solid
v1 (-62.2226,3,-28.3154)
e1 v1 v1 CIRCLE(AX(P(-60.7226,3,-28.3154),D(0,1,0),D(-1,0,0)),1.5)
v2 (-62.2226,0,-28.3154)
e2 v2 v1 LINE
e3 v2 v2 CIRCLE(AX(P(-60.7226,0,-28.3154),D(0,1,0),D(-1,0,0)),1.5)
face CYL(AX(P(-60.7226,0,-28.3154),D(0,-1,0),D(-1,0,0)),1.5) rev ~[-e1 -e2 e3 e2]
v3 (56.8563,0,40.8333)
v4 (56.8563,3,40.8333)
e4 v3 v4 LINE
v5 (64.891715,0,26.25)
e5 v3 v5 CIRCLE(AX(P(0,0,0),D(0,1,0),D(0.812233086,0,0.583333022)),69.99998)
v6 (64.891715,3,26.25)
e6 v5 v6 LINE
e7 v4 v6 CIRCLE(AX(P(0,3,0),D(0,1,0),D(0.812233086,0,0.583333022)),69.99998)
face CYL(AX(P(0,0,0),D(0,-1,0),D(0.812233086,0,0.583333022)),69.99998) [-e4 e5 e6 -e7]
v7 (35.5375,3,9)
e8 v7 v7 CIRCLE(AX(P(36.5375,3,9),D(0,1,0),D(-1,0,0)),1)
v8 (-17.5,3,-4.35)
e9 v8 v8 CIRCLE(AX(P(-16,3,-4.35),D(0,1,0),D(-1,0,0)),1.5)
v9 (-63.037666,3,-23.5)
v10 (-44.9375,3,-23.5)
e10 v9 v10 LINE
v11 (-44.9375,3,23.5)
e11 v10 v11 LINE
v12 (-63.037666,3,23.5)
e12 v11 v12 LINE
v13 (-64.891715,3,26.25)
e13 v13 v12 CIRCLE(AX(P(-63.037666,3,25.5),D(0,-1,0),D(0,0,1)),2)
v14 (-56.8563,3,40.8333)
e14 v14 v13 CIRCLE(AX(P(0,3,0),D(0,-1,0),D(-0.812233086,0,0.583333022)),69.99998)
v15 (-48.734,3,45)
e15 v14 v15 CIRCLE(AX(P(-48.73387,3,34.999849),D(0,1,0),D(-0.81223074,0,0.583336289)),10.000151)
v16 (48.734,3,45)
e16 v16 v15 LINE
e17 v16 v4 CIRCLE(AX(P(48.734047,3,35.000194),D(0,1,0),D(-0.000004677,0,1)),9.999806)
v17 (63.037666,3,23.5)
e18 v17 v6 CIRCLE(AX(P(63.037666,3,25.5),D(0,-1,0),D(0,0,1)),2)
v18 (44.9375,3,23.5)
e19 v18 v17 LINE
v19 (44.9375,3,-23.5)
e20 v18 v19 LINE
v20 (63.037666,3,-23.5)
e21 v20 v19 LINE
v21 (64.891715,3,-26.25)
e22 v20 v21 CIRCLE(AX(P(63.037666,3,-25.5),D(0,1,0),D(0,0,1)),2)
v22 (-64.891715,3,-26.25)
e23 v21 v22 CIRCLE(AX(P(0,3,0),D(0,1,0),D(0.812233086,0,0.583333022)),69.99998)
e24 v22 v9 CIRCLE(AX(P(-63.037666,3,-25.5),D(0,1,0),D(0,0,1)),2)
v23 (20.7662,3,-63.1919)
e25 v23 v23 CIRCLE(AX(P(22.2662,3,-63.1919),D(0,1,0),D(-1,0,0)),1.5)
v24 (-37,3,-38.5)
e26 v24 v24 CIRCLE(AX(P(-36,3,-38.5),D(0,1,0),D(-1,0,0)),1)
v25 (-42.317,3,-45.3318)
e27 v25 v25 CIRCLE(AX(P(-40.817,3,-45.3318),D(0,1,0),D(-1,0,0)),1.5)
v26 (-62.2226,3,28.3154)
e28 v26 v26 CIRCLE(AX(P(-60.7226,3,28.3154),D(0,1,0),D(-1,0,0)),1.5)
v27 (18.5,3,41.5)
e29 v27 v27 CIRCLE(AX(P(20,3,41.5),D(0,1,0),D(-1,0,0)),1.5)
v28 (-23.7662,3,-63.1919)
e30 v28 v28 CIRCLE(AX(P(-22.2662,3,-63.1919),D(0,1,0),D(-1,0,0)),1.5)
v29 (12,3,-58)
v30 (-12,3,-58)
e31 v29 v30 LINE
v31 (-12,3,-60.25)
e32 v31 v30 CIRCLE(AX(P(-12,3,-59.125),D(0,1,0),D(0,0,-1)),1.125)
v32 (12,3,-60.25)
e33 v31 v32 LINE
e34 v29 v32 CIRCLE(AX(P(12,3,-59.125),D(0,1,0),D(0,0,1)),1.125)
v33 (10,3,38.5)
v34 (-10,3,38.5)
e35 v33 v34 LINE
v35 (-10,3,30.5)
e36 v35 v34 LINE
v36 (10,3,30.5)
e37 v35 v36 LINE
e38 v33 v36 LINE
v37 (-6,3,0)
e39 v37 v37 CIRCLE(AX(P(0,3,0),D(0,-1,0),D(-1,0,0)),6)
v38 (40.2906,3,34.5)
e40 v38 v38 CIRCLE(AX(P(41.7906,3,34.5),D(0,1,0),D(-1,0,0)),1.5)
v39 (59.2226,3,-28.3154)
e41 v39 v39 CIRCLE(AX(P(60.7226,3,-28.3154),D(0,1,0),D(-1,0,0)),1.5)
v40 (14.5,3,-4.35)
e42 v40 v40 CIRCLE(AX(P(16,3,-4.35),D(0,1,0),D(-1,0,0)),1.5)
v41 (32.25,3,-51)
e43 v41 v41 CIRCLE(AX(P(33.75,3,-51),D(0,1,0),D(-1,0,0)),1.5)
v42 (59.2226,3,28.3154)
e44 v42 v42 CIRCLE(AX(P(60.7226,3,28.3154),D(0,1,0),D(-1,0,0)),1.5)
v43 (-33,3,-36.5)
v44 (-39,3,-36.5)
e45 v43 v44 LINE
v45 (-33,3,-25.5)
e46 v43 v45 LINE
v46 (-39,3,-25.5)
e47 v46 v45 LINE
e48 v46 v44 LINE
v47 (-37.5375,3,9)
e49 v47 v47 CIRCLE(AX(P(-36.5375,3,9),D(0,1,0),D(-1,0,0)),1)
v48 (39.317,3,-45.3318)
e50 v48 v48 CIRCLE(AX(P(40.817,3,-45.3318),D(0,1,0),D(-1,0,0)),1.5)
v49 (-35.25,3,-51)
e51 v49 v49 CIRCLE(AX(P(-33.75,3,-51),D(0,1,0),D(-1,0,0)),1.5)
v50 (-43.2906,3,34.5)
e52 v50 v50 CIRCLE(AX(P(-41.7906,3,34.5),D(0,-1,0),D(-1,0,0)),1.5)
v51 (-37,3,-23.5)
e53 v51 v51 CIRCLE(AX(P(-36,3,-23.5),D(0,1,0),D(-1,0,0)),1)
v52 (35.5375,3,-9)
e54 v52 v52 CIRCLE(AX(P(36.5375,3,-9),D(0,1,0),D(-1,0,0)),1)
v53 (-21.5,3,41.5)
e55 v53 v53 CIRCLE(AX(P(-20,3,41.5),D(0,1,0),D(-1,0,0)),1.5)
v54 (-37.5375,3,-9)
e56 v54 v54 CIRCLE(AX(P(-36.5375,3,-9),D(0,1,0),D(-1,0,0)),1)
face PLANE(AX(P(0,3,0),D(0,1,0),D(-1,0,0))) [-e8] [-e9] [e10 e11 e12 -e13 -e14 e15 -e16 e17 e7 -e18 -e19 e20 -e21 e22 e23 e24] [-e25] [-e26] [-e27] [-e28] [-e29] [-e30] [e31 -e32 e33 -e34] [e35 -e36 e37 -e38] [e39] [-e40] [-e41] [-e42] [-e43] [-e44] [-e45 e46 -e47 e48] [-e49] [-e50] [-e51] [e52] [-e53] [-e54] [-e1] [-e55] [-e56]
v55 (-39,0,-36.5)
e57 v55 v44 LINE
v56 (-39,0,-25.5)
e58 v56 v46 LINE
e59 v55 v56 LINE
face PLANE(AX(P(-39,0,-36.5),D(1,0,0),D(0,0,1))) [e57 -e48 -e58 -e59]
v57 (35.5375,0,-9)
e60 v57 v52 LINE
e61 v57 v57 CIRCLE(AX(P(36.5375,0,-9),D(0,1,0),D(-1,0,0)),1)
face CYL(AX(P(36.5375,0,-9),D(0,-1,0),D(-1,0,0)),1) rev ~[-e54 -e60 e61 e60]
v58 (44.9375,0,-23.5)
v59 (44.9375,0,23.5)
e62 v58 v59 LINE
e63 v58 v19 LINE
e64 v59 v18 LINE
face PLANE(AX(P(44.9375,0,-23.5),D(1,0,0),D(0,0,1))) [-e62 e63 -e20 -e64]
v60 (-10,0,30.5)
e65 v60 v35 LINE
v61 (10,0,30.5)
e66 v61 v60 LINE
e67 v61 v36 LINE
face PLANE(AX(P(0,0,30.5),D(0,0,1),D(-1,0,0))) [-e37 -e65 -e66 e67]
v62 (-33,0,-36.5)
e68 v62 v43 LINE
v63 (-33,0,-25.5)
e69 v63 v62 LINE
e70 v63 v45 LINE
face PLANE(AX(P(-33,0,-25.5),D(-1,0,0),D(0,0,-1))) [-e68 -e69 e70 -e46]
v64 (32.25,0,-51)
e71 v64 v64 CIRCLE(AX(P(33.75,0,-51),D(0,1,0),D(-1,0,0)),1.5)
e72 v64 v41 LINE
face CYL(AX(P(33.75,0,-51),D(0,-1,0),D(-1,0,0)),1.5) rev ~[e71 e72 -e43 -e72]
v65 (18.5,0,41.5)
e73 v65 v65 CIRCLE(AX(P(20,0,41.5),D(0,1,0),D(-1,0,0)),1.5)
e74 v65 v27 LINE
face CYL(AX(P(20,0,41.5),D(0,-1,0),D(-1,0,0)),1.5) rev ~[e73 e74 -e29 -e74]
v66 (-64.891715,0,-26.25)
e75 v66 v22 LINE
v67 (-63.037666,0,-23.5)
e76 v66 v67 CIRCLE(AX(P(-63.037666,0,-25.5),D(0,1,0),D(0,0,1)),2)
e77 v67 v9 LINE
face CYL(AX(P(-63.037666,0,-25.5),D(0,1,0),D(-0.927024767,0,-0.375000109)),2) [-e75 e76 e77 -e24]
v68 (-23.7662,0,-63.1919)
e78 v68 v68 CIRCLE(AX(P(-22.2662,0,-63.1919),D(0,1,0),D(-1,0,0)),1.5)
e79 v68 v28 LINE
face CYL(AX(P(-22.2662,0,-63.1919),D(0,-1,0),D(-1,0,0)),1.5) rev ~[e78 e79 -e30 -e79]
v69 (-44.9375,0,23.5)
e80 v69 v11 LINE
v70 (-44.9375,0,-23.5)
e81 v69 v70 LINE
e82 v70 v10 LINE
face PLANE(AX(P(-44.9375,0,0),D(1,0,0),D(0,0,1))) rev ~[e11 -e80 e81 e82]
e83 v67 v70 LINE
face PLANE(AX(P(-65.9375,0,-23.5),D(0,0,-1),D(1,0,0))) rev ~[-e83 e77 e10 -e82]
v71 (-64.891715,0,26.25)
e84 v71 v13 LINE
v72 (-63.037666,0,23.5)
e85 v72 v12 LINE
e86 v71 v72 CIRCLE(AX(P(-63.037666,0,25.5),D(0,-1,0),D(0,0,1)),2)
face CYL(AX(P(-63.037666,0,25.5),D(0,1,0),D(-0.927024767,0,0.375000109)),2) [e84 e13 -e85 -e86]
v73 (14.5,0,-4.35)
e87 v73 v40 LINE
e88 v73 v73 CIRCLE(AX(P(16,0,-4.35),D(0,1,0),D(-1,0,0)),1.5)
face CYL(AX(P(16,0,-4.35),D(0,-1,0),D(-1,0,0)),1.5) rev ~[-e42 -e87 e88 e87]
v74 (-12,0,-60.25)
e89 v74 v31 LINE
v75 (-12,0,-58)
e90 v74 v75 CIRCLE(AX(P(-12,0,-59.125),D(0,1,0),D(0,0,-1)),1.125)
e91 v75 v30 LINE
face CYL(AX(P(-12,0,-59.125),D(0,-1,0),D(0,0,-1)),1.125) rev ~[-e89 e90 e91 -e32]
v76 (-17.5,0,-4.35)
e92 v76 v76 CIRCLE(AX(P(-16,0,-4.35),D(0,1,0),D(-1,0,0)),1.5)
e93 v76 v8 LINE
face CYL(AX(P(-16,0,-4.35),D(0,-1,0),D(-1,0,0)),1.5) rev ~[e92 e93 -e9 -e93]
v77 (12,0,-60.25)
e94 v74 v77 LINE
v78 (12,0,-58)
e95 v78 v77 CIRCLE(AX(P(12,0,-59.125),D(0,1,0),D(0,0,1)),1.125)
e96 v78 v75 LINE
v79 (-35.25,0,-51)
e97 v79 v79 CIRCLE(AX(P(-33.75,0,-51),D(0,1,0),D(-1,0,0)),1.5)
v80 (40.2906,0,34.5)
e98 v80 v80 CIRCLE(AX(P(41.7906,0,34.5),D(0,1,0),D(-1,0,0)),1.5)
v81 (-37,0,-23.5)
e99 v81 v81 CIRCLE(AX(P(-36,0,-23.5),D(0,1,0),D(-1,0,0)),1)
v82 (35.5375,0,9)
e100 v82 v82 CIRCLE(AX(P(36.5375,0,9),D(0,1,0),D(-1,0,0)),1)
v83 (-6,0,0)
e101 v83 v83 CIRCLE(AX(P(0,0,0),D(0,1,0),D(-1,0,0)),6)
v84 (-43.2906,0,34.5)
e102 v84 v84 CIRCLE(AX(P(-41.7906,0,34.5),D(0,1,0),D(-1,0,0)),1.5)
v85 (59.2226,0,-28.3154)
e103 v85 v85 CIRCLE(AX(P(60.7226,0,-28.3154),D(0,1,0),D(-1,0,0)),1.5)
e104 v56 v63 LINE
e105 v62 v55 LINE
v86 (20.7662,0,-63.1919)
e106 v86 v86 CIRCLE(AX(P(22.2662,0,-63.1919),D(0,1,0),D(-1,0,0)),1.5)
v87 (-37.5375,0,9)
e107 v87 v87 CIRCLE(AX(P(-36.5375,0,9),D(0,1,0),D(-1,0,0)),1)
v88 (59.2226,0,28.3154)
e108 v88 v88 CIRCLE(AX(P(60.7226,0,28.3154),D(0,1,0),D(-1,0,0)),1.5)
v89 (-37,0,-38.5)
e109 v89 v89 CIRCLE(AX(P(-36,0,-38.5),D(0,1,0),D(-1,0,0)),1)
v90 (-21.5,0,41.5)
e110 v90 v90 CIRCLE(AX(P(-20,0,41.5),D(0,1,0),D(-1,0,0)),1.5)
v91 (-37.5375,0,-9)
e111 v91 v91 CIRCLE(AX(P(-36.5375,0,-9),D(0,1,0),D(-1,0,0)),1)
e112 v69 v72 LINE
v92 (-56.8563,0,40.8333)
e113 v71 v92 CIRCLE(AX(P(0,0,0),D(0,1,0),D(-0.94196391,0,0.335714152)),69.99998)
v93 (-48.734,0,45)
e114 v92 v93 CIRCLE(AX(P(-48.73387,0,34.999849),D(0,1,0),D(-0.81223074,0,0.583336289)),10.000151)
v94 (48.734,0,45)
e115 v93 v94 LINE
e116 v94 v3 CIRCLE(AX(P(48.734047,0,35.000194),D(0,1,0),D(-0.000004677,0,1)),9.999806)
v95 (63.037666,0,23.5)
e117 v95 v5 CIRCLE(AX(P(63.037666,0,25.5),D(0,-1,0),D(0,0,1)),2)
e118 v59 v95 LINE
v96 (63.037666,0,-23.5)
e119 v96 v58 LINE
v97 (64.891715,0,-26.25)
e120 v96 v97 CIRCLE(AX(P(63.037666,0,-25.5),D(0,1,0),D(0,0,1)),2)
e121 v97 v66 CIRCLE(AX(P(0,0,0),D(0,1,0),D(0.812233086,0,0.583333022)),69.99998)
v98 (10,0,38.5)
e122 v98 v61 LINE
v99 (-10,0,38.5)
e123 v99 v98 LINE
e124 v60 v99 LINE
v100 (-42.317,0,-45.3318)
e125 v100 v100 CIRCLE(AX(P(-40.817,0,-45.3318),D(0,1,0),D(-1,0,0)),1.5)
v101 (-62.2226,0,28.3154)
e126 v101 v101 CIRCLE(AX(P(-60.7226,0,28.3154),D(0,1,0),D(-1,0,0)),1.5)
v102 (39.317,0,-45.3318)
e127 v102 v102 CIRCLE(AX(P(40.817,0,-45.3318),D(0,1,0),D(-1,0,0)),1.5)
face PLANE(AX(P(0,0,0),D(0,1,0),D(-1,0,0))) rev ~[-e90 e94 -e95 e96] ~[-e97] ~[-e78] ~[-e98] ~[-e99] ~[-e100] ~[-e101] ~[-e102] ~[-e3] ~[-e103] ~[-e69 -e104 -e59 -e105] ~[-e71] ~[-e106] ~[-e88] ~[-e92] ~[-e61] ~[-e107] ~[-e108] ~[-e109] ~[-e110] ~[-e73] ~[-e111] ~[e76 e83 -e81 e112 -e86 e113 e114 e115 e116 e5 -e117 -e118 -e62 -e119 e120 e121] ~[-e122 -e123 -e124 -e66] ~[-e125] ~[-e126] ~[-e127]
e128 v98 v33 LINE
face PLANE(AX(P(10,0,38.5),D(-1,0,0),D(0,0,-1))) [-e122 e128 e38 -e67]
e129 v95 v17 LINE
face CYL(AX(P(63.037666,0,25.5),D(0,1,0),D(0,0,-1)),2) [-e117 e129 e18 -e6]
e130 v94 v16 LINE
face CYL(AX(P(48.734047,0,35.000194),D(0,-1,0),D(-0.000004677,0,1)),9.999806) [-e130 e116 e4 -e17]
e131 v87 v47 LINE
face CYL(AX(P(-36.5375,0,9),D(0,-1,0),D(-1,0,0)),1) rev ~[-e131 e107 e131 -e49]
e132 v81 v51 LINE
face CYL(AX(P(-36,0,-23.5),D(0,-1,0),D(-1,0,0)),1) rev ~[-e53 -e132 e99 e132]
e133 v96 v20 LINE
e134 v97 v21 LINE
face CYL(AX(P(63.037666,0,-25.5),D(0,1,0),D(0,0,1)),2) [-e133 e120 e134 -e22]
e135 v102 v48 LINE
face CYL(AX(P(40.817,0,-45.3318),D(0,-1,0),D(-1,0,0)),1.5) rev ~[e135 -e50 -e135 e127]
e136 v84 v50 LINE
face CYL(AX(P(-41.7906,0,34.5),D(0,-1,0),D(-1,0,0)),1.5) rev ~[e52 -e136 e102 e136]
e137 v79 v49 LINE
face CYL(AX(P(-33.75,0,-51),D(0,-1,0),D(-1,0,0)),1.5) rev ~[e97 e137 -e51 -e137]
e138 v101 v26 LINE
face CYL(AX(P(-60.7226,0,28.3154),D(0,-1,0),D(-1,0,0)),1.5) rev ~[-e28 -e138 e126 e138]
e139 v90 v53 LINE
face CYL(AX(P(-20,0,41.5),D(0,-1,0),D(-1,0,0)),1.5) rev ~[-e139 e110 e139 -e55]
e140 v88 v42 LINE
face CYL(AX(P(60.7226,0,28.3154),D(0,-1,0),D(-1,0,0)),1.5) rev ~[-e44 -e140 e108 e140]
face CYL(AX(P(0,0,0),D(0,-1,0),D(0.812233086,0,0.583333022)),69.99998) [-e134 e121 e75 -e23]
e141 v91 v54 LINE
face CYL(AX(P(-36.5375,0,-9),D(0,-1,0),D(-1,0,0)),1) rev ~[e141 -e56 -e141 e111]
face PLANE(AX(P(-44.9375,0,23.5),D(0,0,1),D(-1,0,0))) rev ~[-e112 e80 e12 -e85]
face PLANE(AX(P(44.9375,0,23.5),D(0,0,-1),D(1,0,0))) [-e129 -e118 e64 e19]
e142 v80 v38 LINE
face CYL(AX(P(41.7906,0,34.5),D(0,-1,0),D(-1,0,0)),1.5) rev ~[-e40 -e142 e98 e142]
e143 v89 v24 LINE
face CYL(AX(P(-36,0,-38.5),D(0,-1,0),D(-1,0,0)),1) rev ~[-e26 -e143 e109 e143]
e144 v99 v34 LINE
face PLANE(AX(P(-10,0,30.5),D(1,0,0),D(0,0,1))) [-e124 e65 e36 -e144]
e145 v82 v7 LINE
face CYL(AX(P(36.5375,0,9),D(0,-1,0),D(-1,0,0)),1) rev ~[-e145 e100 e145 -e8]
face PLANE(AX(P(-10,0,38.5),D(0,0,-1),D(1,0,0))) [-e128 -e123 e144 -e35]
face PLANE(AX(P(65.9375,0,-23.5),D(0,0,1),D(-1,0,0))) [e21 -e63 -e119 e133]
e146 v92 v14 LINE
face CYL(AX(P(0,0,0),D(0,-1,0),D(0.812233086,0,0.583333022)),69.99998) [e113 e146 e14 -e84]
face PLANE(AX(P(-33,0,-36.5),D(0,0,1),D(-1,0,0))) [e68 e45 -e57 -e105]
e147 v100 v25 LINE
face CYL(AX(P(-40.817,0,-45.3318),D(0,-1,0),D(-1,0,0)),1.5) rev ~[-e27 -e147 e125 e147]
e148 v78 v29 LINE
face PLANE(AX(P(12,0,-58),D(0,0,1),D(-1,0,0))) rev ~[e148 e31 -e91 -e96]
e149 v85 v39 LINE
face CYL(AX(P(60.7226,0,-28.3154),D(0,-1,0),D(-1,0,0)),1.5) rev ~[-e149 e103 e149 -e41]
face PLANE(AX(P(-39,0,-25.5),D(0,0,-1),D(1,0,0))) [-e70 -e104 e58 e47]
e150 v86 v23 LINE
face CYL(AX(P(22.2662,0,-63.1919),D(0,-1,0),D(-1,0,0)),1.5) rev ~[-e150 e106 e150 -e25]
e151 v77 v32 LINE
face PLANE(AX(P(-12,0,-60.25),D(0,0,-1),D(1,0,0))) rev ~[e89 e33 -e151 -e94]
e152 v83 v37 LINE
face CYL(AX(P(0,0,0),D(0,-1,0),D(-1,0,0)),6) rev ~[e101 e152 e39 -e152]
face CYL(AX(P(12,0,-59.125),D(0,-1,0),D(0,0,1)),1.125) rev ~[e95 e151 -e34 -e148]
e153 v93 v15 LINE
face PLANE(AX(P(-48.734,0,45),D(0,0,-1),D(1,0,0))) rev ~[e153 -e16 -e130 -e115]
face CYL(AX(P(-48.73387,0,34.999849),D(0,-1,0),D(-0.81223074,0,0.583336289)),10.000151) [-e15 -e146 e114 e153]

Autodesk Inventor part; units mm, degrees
ref_plane "YZ Plane" through (0, 0, 0) normal (1, 0, 0) x (0, 1, 0)
ref_plane "XZ Plane" through (0, 0, 0) normal (0, 1, 0) x (-1, 0, 0)
ref_plane "XY Plane" through (0, 0, 0) normal (0, 0, 1) x (1, 0, 0)
sketch "Sketch1" plane through (0, 0, 0) normal (0, 1, 0) x (-1, 0, 0)
  line L0 (48.734, 45) -> (-48.734, 45)
  line L1 (12, -60.25) -> (-12, -60.25)
  line L2 (-12, -58) -> (12, -58)
  circle A0 centre (0, 0) radius 6
  circle A1 centre (-22.2662, -63.1919) radius 1.5
  circle A2 centre (-41.7906, 34.5) radius 1.5
  circle A3 centre (-60.7226, -28.3154) radius 1.5
  circle A4 centre (60.7226, -28.3154) radius 1.5
  circle A5 centre (-20, 41.5) radius 1.5
  circle A6 centre (41.7906, 34.5) radius 1.5
  circle A7 centre (20, 41.5) radius 1.5
  circle A8 centre (22.2662, -63.1919) radius 1.5
  arc A9 (12, -60.25) -> (12, -58) centre (12, -59.125) ccw
  arc A10 (-12, -58) -> (-12, -60.25) centre (-12, -59.125) ccw
  circle A11 centre (0, 0) radius 67 construction
  circle A12 centre (0, 0) radius 54.1913 construction
  line L3 (0, 0) -> (0, 45)
  arc A13 (-56.8563, 40.8333) -> (56.8563, 40.8333) centre (0, 0) ccw
  arc A14 (-48.734, 45) -> (-56.8563, 40.8333) centre (-48.734, 35) ccw
  arc A15 (56.8563, 40.8333) -> (48.734, 45) centre (48.734, 35) ccw
  line L4 (0, 0) -> (-70, 0)
  line L5 (0, 0) -> (60.7226, -28.3154) construction
  line L6 (0, 0) -> (67, 0)
  line L7 (0, 0) -> (41.7906, 34.5) construction
  line L8 (44.9375, 23.5) -> (65.9375, 23.5)
  line L9 (65.9375, 23.5) -> (65.9375, -23.5)
  line L10 (65.9375, -23.5) -> (44.9375, -23.5)
  line L11 (44.9375, -23.5) -> (44.9375, 23.5)
  line L12 (44.9375, 23.5) -> (65.9375, -23.5) construction
  line L13 (65.9375, 23.5) -> (44.9375, -23.5) construction
  circle A16 centre (36.5375, -9) radius 1
  circle A17 centre (36.5375, 9) radius 1
  circle A18 centre (16, -4.35) radius 1.5
  circle A19 centre (33.75, -51) radius 1.5
  circle A20 centre (-16, -4.35) radius 1.5
  circle A21 centre (-33.75, -51) radius 1.5
  line L14 (-44.9375, 23.5) -> (-65.9375, 23.5)
  line L15 (-65.9375, 23.5) -> (-65.9375, -23.5)
  line L16 (-65.9375, -23.5) -> (-44.9375, -23.5)
  line L17 (-44.9375, -23.5) -> (-44.9375, 23.5)
  circle A22 centre (-36.5375, -9) radius 1
  circle A23 centre (-36.5375, 9) radius 1
  line L18 (10, 38.5) -> (-10, 38.5)
  line L19 (-10, 38.5) -> (-10, 30.5)
  line L20 (-10, 30.5) -> (10, 30.5)
  line L21 (10, 30.5) -> (10, 38.5)
  line L22 (10, 38.5) -> (-10, 30.5) construction
  line L23 (-10, 38.5) -> (10, 30.5) construction
  line L24 (39, -25.5) -> (33, -25.5)
  line L25 (33, -25.5) -> (33, -36.5)
  line L26 (33, -36.5) -> (39, -36.5)
  line L27 (39, -36.5) -> (39, -25.5)
  circle A24 centre (36, -38.5) radius 1
  line L28 (39, -31) -> (33, -31)
  circle A25 centre (36, -23.5) radius 1
  circle A26 centre (40.817, -45.3318) radius 1.5
  circle A27 centre (-41.7906, 34.5) radius 1.5
  circle A28 centre (-40.817, -45.3318) radius 1.5
  line L29 (41.7906, 34.5) -> (41.7906, 39.5)
  line L30 (41.7906, 39.5) -> (57.7906, 39.5)
  line L31 (0, 0) -> (22.2662, -63.1919) construction
  circle A29 centre (60.7226, 28.3154) radius 1.5
  circle A30 centre (-60.7226, 28.3154) radius 1.5
  line L32 (40.817, -45.3318) -> (0, 0) construction
  line L33 (0, 0) -> (60.7226, 28.3154) construction
  point P0 (-5.9883, -61.0615)
  point P1 (55.4375, 0)
  point P2 (-65.9375, -23.5)
  point P3 (0, 34.5)
  point P4 (36, -36.5)
  point P5 (53.2983, 43.8976)
  point P6 (0, -6)
  dimension "d12" = 12
  dimension "d0" = 3
  dimension "d1" = 3
  dimension "d4" = 3
  dimension "d15" = 24
  dimension "d16" = 3
  dimension "d62" = 2.25
  dimension "d148" = 3.5
  dimension "d276" = 134
  dimension "d285" = 140
  dimension "d286" = 45
  dimension "d287" = 10
  dimension "d288" = 12
  dimension "d289" = 40
  dimension "d290" = 3.5
  dimension "d291" = 20
  dimension "d293" = 25
  dimension "d300" = 21
  dimension "d301" = 47
  dimension "d304" = 2
  dimension "d305" = 8.4
  dimension "d306" = 9
  dimension "d307" = 3
  dimension "d311" = 16
  dimension "d318" = 33.75
  dimension "d321" = 20
  dimension "d322" = 8
  dimension "d323" = 11
  dimension "d324" = 6
  dimension "d325" = 2
  dimension "d326" = 2
  dimension "d327" = 15
  dimension "d338" = 33
  dimension "d342" = 5
  dimension "d344" = 16
  dimension "d345" = 11
  dimension "d346" = 39.541
  dimension "d347" = 108.3827
  dimension "d348" = 19.41
  dimension "d350" = 61
  dimension "d351" = 48
  dimension "d352" = 3
  dimension "d353" = 4.35
  dimension "d354" = 51
  dimension "d355" = 25
  dimension "d356" = 58
  dimension "d358" = 65.9375
extrude "Extrusion1" add sketch "Sketch1" along normal blind 3 contours A15 A13 L8 L11 L6 A0 L3 L20 L21 L18 L0 | L3 L18 L19 L20 A0 L4 L17 L14 A13 A14 L0 | A13 L16 L17 L4 A0 L6 L11 L10
fillet "Fillet1" radius 2 1 edges at (65.9375, 1.5, 23.5)
fillet "Fillet2" radius 2 3 edges at (65.9375, 1.5, -23.5) (-65.9375, 1.5, -23.5) (-65.9375, 1.5, 23.5)
sketch "Sketch2" plane through (0, 3, 0) normal (0, 1, 0) x (1, 0, 0)
  circle A0 centre (60.7226, 28.3154) radius 1.5 projected
  circle A1 centre (60.7226, -28.3154) radius 1.5 projected
  line L0 (60.7226, 28.3154) -> (60.7226, -28.3154)
  line L1 (60.7226, -28.3154) -> (60.7226, -30.3154)
  line L2 (60.7226, -26.3154) -> (59.2226, -26.3154)
  line L3 (-48.734, -45) -> (48.734, -45) projected
  line L4 (0, -45) -> (0, 70)
  arc A2 (64.8917, 26.25) -> (-64.8917, 26.25) centre (0, 0) ccw projected
  line L5 (57.6226, -30.3154) -> (57.6226, -26.3154)
  line L6 (57.6226, -26.3154) -> (59.2226, -26.3154)
  line L7 (60.7226, -26.3154) -> (60.7226, -30.3154)
  line L8 (57.6226, -30.3154) -> (57.6226, -31.8154)
  line L9 (57.6226, -31.8154) -> (60.7226, -31.8154)
  line L10 (60.7226, -31.8154) -> (60.7226, -30.3154)
  line L11 (60.7226, -28.3154) -> (57.6226, -28.3154)
  line L12 (-70, 0) -> (70, 0)
  line L13 (60.7226, 28.3154) -> (60.7226, 30.3154)
  line L14 (60.7226, 26.3154) -> (59.2226, 26.3154)
  line L15 (57.6226, 30.3154) -> (57.6226, 26.3154)
  line L16 (57.6226, 26.3154) -> (59.2226, 26.3154)
  line L17 (60.7226, 26.3154) -> (60.7226, 30.3154)
  line L18 (57.6226, 30.3154) -> (57.6226, 31.8154)
  line L19 (57.6226, 31.8154) -> (60.7226, 31.8154)
  line L20 (60.7226, 31.8154) -> (60.7226, 30.3154)
  line L21 (-60.7226, -26.3154) -> (-59.2226, -26.3154)
  line L22 (-57.6226, -30.3154) -> (-57.6226, -26.3154)
  line L23 (-57.6226, -26.3154) -> (-59.2226, -26.3154)
  line L24 (-60.7226, -26.3154) -> (-60.7226, -30.3154)
  line L25 (-57.6226, -30.3154) -> (-57.6226, -31.8154)
  line L26 (-57.6226, -31.8154) -> (-60.7226, -31.8154)
  line L27 (-60.7226, -31.8154) -> (-60.7226, -30.3154)
  line L28 (-60.7226, -28.3154) -> (-57.6226, -28.3154)
  line L29 (-57.6226, 31.8154) -> (-60.7226, 31.8154)
  line L30 (-57.6226, 30.3154) -> (-57.6226, 31.8154)
  line L31 (-57.6226, 30.3154) -> (-57.6226, 26.3154)
  line L32 (-57.6226, 26.3154) -> (-59.2226, 26.3154)
  line L33 (-60.7226, 26.3154) -> (-59.2226, 26.3154)
  line L34 (-60.7226, 31.8154) -> (-60.7226, 30.3154)
  line L35 (-60.7226, 28.3154) -> (-60.7226, 30.3154)
  line L36 (-60.7226, 26.3154) -> (-60.7226, 30.3154)
  line L37 (-60.7226, 28.3154) -> (-57.6226, 28.3154)
  line L38 (60.7226, 28.3154) -> (57.6226, 28.3154)
  point P0 (60.7226, 26.8154)
  point P1 (60.7226, 29.8154)
  point P2 (60.7226, -29.8154)
  point P3 (60.7226, -26.8154)
  point P4 (60.7226, -26.3154)
  dimension "d363" = 1.5
  dimension "d365" = 4
  dimension "d366" = 1.5
  dimension "d367" = 3.1
  dimension "d368" = 1.6
extrude "Extrusion2" [suppressed]
properties part number "base_chasis_v5"
